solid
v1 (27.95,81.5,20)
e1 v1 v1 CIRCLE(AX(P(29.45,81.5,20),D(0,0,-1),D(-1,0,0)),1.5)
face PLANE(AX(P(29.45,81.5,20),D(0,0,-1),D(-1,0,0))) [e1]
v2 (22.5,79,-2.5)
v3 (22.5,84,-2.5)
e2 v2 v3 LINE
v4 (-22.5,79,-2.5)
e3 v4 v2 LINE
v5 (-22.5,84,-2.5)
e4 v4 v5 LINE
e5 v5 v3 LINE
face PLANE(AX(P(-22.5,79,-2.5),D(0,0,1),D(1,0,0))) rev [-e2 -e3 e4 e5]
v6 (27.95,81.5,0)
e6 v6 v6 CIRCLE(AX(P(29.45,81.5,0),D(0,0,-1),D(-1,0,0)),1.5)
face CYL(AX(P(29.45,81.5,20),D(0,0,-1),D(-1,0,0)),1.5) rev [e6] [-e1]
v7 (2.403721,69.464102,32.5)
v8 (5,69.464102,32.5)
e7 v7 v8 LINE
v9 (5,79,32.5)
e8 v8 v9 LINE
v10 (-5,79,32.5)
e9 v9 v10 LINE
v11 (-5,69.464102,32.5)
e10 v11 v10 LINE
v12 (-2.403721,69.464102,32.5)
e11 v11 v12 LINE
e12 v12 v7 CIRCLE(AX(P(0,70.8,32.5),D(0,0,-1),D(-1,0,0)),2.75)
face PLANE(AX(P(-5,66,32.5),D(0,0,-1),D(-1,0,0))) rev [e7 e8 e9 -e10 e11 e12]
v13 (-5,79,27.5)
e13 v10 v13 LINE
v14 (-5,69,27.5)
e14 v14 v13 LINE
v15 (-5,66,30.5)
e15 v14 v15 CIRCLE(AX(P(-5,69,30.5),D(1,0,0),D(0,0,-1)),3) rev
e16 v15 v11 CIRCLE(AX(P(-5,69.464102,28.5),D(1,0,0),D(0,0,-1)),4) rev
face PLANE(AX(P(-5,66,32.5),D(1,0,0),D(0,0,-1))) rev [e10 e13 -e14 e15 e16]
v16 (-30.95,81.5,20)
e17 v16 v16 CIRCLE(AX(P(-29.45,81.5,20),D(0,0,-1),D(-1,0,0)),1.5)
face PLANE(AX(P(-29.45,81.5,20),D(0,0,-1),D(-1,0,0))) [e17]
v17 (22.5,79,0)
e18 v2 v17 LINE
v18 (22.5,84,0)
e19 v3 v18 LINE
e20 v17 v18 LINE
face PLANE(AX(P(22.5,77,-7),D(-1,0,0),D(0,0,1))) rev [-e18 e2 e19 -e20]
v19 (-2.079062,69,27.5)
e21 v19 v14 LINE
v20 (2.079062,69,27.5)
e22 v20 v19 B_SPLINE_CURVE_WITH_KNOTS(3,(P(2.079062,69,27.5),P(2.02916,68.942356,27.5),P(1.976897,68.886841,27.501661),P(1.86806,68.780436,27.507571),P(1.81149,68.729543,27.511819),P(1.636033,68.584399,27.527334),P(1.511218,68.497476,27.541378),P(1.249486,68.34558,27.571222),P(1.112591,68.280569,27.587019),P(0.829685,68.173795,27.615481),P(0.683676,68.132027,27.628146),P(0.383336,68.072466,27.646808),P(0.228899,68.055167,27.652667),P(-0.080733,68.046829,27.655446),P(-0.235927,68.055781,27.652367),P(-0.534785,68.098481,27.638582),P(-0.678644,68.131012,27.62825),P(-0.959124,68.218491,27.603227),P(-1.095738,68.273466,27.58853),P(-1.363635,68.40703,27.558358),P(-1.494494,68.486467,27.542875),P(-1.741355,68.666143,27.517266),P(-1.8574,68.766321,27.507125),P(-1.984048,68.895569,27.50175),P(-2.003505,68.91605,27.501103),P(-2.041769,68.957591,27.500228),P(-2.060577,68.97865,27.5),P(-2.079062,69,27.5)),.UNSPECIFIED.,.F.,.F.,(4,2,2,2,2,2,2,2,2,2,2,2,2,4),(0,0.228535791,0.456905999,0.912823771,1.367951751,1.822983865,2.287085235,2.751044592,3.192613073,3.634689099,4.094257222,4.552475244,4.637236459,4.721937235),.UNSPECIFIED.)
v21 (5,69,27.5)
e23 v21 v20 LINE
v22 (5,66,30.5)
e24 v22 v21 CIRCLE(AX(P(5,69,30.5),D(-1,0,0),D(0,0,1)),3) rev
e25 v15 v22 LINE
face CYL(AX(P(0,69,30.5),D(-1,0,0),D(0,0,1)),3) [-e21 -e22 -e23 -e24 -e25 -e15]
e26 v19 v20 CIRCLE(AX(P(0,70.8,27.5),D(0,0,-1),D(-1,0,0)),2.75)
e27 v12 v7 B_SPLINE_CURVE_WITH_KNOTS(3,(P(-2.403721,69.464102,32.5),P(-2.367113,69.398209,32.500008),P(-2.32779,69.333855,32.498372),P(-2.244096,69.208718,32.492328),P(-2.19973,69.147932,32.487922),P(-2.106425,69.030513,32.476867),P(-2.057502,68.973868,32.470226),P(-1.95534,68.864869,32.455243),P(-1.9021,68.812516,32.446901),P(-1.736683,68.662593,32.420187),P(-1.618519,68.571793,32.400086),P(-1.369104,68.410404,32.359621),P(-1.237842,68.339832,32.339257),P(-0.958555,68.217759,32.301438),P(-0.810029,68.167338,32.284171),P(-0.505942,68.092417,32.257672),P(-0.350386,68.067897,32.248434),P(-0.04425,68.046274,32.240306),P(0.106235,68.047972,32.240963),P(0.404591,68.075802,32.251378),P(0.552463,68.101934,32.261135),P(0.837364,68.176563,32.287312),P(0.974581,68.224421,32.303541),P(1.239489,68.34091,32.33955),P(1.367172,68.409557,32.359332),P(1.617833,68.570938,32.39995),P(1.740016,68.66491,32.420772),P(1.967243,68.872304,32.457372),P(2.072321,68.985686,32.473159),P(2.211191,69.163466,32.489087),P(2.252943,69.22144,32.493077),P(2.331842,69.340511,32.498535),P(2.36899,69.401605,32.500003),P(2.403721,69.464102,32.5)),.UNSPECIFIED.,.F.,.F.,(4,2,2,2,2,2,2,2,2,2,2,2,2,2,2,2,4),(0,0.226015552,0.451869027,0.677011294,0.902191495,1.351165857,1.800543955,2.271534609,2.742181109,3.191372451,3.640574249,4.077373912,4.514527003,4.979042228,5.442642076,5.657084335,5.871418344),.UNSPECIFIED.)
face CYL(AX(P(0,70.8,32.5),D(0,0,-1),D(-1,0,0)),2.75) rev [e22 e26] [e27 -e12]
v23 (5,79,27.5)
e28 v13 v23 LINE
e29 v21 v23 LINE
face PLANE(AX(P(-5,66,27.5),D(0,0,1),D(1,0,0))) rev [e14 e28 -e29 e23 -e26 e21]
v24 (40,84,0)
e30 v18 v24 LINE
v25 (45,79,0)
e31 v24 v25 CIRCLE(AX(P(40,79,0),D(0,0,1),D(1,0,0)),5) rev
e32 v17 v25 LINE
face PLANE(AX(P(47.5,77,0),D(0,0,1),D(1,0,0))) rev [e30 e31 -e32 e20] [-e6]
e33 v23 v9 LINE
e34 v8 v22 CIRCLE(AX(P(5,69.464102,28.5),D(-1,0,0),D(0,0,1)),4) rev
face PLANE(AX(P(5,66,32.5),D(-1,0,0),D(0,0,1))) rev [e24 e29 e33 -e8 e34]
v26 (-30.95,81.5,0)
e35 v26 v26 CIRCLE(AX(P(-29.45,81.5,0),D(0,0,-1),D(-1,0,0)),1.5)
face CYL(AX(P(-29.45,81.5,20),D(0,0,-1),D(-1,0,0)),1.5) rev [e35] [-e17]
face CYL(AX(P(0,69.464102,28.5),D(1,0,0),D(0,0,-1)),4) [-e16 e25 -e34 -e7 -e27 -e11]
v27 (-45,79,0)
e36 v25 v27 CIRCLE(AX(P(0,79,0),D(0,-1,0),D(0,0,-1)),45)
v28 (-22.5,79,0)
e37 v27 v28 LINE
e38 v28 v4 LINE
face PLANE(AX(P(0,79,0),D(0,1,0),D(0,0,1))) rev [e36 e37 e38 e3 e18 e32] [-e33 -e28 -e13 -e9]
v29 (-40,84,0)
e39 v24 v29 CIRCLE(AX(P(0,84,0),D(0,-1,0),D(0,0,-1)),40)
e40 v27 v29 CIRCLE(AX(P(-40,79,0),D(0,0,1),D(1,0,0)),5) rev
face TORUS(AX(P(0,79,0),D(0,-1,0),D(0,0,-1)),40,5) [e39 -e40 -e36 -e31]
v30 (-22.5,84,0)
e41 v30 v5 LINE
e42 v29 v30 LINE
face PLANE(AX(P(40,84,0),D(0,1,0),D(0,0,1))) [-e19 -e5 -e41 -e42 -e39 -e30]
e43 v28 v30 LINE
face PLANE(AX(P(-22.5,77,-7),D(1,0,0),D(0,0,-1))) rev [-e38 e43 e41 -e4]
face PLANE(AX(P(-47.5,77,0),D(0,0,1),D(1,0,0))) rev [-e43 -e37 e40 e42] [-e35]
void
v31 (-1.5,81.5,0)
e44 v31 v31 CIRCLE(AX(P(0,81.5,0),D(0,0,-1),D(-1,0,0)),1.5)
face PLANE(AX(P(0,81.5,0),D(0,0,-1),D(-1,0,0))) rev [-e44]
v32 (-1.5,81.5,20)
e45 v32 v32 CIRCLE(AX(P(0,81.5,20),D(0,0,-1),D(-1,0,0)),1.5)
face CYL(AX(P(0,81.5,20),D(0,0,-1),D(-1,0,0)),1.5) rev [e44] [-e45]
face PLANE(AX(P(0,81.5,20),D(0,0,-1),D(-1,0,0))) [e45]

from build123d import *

# Parameters (mm, degrees)
CUT_EXTRUDE1_DEPTH           = 5
CUT_EXTRUDE3_DEPTH           = 45
SKETCH8_R                    = 43
CUT_EXTRUDE4_DEPTH           = 32
SKETCH9_R                    = 32
SKETCH9_R_2                  = 24.5
CUT_EXTRUDE5_DEPTH           = 14
SKETCH10_R                   = 26
CUT_EXTRUDE6_DEPTH           = 14
FILLET1_R                    = 7
FILLET2_R                    = 7
SKETCH12_W                   = 6.590120242
SKETCH12_H                   = 30.5
CUT_REVOLVE1_ANGLE           = 60
CUT_REVOLVE1_OTHER_WAY_ANGLE = 60
CUT_EXTRUDE12_DEPTH          = 5
SKETCH18_W                   = 13
SKETCH18_H                   = 8
CUT_EXTRUDE13_DEPTH          = 5
INTERSECT1_OUTLINE_R         = 45
INTERSECT1_DEPTH             = 79
SKETCH20_W                   = 10
SKETCH20_H                   = 5
BOSS_EXTRUDE1_DEPTH          = 13
BOSS_EXTRUDE3_DEPTH          = 5
SKETCH19_R                   = 1.5
CUT_EXTRUDE14_DEPTH          = 20
SKETCH23_W                   = 25
SKETCH23_H                   = 7
CUT_EXTRUDE15_DEPTH          = 7
SKETCH24_W                   = 45
SKETCH24_H                   = 2.5
CUT_EXTRUDE16_DEPTH          = 5
SKETCH25_R                   = 2.75
CUT_EXTRUDE17_DEPTH          = 5
FILLET4_R                    = 3
FILLET6_R                    = 4


with BuildPart() as part:
    # Sketch1 → Revolve1 (revolve)
    with BuildSketch(Plane.XY, mode=Mode.PRIVATE) as revolve1_sk:
        with BuildLine():
            Line((22.5, 0), (32, 0))
            ThreePointArc((32, 0), (33.414213562, 0.585786438), (34, 2))
            Line((34, 2), (34, 18))
            Line((34, 18), (43, 18))
            ThreePointArc((43, 18), (44.414213562, 18.585786438), (45, 20))
            Line((45, 20), (45, 79))
            ThreePointArc((45, 79), (43.535533906, 82.535533906), (40, 84))
            Line((40, 84), (0, 84))
            Line((0, 84), (0, 18))
            Line((0, 18), (22.5, 18))
            Line((22.5, 18), (22.5, 0))
        make_face()
    revolve(revolve1_sk.sketch.rotate(Axis((0, 2, 0), (0, 1, 0)), 90), axis=Axis((0, 2, 0), (0, 1, 0)))

    # Sketch5 → Cut-Extrude1 (cut)
    with BuildSketch(Plane(origin=(0, 84, 0), x_dir=(1, 0, 0), z_dir=(0, 1, 0))):
        with BuildLine():
            Line((-45, 0), (-40, 0))
            Line((-40, 0), (40, 0))
            Line((40, 0), (45, 0))
            ThreePointArc((45, 0), (0, 45), (-45, 0))
        make_face()
    extrude(amount=-CUT_EXTRUDE1_DEPTH, mode=Mode.SUBTRACT)

    # Sketch7 → Cut-Extrude3 (cut)
    with BuildSketch(Plane.XZ.offset(-18)):
        with BuildLine():
            Line((-21, 0), (21, 0))
            ThreePointArc((21, 0), (0, -21), (-21, 0))
        make_face()
    extrude(amount=-CUT_EXTRUDE3_DEPTH, mode=Mode.SUBTRACT)

    # Sketch8 → Cut-Extrude4 (cut)
    with BuildSketch(Plane(origin=(0, 76.5, 0), x_dir=(1, 0, 0), z_dir=(0, 1, 0))):
        with Locations(Location((0, 0, 0), (0, 0, 270))):
            Circle(SKETCH8_R)
        with BuildLine():
            Line((22.912878475, -2), (-22.912878475, -2))
            ThreePointArc((-22.912878475, -2), (0, 23), (22.912878475, -2))
        make_face(mode=Mode.SUBTRACT)
    extrude(amount=-CUT_EXTRUDE4_DEPTH, mode=Mode.SUBTRACT)

    # Sketch9 → Cut-Extrude5 (cut)
    with BuildSketch(Plane(origin=(0, 2, 0), x_dir=(-1, 0, 0), z_dir=(0, -1, 0))):
        with Locations(Location((0, 0, 0), (0, 0, 90))):
            Circle(SKETCH9_R)
        with Locations(Location((0, 0, 0), (0, 0, 90))):
            Circle(SKETCH9_R_2, mode=Mode.SUBTRACT)
    extrude(amount=-CUT_EXTRUDE5_DEPTH, mode=Mode.SUBTRACT)

    # Sketch10 → Cut-Extrude6 (cut)
    with BuildSketch(Plane(origin=(0, 2, 0), x_dir=(-1, 0, 0), z_dir=(0, -1, 0))):
        Circle(SKETCH10_R)
    extrude(amount=-CUT_EXTRUDE6_DEPTH, mode=Mode.SUBTRACT)

    # Fillet1
    fillet1_edges = [part.edges().sort_by_distance(p)[0] for p in [
        (21, 40.5, 0),
        (-21, 40.5, 0),
    ]]
    fillet(fillet1_edges, radius=FILLET1_R)

    # Fillet2
    fillet2_edges = [part.edges().sort_by_distance(p)[0] for p in [
        (-22.912878475, 60.5, 2),
        (22.912878475, 60.5, 2),
    ]]
    fillet(fillet2_edges, radius=FILLET2_R)

    # Sketch12 → Cut-Revolve1 (revolve, cut)
    with BuildSketch(Plane(origin=(0, 0, 0), x_dir=(0, 0, -1), z_dir=(1, 0, 0))):
        with Locations((-40.662298382, 61.25)):
            Rectangle(SKETCH12_W, SKETCH12_H)
    revolve(axis=Axis((0, 99.14944168, 0), (0, 1, 0)), revolution_arc=CUT_REVOLVE1_ANGLE, mode=Mode.SUBTRACT)

    # Sketch12 → Cut-Revolve1 other way (revolve, cut)
    with BuildSketch(Plane(origin=(0, 0, 0), x_dir=(0, 0, -1), z_dir=(1, 0, 0))):
        with Locations((-40.662298382, 61.25)):
            Rectangle(SKETCH12_W, SKETCH12_H)
    revolve(axis=Axis((0, 99.14944168, 0), (0, -1, 0)), revolution_arc=CUT_REVOLVE1_OTHER_WAY_ANGLE, mode=Mode.SUBTRACT)

    # Sketch15 → Cut-Extrude12 (cut)
    with BuildSketch(Plane(origin=(0, 44.5, 0), x_dir=(1, 0, 0), z_dir=(0, 1, 0))):
        with BuildLine():
            Line((-28.124355653, -3.514579578), (-26.124355653, -3.514579578))
            ThreePointArc((-26.124355653, -3.514579578), (-24.710142091, -2.928793141), (-24.124355653, -1.514579578))
            Line((-24.124355653, -1.514579578), (-24.124355653, 8.485420422))
            ThreePointArc((-24.124355653, 8.485420422), (-24.710142091, 9.899633984), (-26.124355653, 10.485420422))
            Line((-26.124355653, 10.485420422), (-28.124355653, 10.485420422))
            ThreePointArc((-28.124355653, 10.485420422), (-29.538569215, 9.899633984), (-30.124355653, 8.485420422))
            Line((-30.124355653, 8.485420422), (-30.124355653, -1.514579578))
            ThreePointArc((-30.124355653, -1.514579578), (-29.538569215, -2.928793141), (-28.124355653, -3.514579578))
        make_face()
    extrude(amount=-CUT_EXTRUDE12_DEPTH, mode=Mode.SUBTRACT)

    # Sketch18 → Cut-Extrude13 (cut)
    with BuildSketch(Plane(origin=(0, 79, 0), x_dir=(1, 0, 0), z_dir=(0, 1, 0))):
        with Locations((0.796512215, 32.951769165)):
            Rectangle(SKETCH18_W, SKETCH18_H)
    extrude(amount=-CUT_EXTRUDE13_DEPTH, mode=Mode.SUBTRACT)

    # Intersect1: read off the stored shape, not the designer's step
    # Intersect1 outline → Intersect1 (cut)
    with BuildSketch(Plane(origin=(0, 0, 0), x_dir=(1, 0, 0), z_dir=(0, 1, 0))):
        Circle(INTERSECT1_OUTLINE_R)
    extrude(amount=INTERSECT1_DEPTH, mode=Mode.SUBTRACT)

    # Sketch20 → Boss-Extrude1 (add)
    with BuildSketch(Plane.XZ.offset(-79)):
        with Locations((0, 30)):
            Rectangle(SKETCH20_W, SKETCH20_H)
    extrude(amount=BOSS_EXTRUDE1_DEPTH)

    # Sketch22 → Boss-Extrude3 (add)
    with BuildSketch(Plane(origin=(0, 0, 0), x_dir=(-1, 0, 0), z_dir=(0, 0, -1))):
        with BuildLine():
            Line((40, 84), (-40, 84))
            ThreePointArc((-40, 84), (-43.535533906, 82.535533906), (-45, 79))
            Line((-45, 79), (45, 79))
            ThreePointArc((45, 79), (43.535533906, 82.535533906), (40, 84))
        make_face()
    extrude(amount=BOSS_EXTRUDE3_DEPTH)

    # Sketch19 → Cut-Extrude14 (cut)
    with BuildSketch(Plane(origin=(0, 0, 0), x_dir=(-1, 0, 0), z_dir=(0, 0, -1))):
        with Locations((0, 81.5)):
            Circle(SKETCH19_R)
        with Locations((-29.45, 81.5)):
            Circle(SKETCH19_R)
        with Locations((29.45, 81.5)):
            Circle(SKETCH19_R)
    extrude(amount=-CUT_EXTRUDE14_DEPTH, mode=Mode.SUBTRACT)

    # Sketch23 → Cut-Extrude15 (cut)
    with BuildSketch(Plane(origin=(0, 84, 0), x_dir=(1, 0, 0), z_dir=(0, 1, 0))):
        with Locations((-35, 3.5)):
            Rectangle(SKETCH23_W, SKETCH23_H)
        with Locations((35, 3.5)):
            Rectangle(SKETCH23_W, SKETCH23_H)
    extrude(amount=-CUT_EXTRUDE15_DEPTH, mode=Mode.SUBTRACT)

    # Sketch24 → Cut-Extrude16 (cut)
    with BuildSketch(Plane(origin=(0, 84, 0), x_dir=(1, 0, 0), z_dir=(0, 1, 0))):
        with Locations((0, 3.75)):
            Rectangle(SKETCH24_W, SKETCH24_H)
    extrude(amount=-CUT_EXTRUDE16_DEPTH, mode=Mode.SUBTRACT)

    # Sketch25 → Cut-Extrude17 (cut)
    with BuildSketch(Plane(origin=(0, 0, 27.5), x_dir=(-1, 0, 0), z_dir=(0, 0, -1))):
        with Locations((0, 70.8)):
            Circle(SKETCH25_R)
    extrude(amount=-CUT_EXTRUDE17_DEPTH, mode=Mode.SUBTRACT)

    # Fillet4
    # the kernel refuses this fillet: 3 mm, written as the material it takes off along each edge
    with BuildSketch(Plane(origin=(12.5, 66, 27.5), x_dir=(0, 1, 0), z_dir=(-1, 0, 0))) as fillet4_piece_1:
        with BuildLine():
            CenterArc((FILLET4_R, -FILLET4_R), FILLET4_R, 90, 90)
            Line((0, -FILLET4_R), (0, 0))
            Line((0, 0), (FILLET4_R, 0))
        make_face()
    extrude(amount=25, mode=Mode.SUBTRACT)

    # Fillet6
    # the kernel refuses this fillet: 4 mm, written as the material it takes off along each edge
    with BuildSketch(Plane(origin=(-13.660254038, 66, 32.5), x_dir=(0, 1, 0), z_dir=(1, 0, 0))) as fillet6_piece_1:
        with BuildLine():
            CenterArc((3.464101615, -4), FILLET6_R, 90, 60)
            Line((0, -2), (0, 0))
            Line((0, 0), (3.464101615, 0))
        make_face()
    extrude(amount=27.320508076, mode=Mode.SUBTRACT)


solid = part.part
